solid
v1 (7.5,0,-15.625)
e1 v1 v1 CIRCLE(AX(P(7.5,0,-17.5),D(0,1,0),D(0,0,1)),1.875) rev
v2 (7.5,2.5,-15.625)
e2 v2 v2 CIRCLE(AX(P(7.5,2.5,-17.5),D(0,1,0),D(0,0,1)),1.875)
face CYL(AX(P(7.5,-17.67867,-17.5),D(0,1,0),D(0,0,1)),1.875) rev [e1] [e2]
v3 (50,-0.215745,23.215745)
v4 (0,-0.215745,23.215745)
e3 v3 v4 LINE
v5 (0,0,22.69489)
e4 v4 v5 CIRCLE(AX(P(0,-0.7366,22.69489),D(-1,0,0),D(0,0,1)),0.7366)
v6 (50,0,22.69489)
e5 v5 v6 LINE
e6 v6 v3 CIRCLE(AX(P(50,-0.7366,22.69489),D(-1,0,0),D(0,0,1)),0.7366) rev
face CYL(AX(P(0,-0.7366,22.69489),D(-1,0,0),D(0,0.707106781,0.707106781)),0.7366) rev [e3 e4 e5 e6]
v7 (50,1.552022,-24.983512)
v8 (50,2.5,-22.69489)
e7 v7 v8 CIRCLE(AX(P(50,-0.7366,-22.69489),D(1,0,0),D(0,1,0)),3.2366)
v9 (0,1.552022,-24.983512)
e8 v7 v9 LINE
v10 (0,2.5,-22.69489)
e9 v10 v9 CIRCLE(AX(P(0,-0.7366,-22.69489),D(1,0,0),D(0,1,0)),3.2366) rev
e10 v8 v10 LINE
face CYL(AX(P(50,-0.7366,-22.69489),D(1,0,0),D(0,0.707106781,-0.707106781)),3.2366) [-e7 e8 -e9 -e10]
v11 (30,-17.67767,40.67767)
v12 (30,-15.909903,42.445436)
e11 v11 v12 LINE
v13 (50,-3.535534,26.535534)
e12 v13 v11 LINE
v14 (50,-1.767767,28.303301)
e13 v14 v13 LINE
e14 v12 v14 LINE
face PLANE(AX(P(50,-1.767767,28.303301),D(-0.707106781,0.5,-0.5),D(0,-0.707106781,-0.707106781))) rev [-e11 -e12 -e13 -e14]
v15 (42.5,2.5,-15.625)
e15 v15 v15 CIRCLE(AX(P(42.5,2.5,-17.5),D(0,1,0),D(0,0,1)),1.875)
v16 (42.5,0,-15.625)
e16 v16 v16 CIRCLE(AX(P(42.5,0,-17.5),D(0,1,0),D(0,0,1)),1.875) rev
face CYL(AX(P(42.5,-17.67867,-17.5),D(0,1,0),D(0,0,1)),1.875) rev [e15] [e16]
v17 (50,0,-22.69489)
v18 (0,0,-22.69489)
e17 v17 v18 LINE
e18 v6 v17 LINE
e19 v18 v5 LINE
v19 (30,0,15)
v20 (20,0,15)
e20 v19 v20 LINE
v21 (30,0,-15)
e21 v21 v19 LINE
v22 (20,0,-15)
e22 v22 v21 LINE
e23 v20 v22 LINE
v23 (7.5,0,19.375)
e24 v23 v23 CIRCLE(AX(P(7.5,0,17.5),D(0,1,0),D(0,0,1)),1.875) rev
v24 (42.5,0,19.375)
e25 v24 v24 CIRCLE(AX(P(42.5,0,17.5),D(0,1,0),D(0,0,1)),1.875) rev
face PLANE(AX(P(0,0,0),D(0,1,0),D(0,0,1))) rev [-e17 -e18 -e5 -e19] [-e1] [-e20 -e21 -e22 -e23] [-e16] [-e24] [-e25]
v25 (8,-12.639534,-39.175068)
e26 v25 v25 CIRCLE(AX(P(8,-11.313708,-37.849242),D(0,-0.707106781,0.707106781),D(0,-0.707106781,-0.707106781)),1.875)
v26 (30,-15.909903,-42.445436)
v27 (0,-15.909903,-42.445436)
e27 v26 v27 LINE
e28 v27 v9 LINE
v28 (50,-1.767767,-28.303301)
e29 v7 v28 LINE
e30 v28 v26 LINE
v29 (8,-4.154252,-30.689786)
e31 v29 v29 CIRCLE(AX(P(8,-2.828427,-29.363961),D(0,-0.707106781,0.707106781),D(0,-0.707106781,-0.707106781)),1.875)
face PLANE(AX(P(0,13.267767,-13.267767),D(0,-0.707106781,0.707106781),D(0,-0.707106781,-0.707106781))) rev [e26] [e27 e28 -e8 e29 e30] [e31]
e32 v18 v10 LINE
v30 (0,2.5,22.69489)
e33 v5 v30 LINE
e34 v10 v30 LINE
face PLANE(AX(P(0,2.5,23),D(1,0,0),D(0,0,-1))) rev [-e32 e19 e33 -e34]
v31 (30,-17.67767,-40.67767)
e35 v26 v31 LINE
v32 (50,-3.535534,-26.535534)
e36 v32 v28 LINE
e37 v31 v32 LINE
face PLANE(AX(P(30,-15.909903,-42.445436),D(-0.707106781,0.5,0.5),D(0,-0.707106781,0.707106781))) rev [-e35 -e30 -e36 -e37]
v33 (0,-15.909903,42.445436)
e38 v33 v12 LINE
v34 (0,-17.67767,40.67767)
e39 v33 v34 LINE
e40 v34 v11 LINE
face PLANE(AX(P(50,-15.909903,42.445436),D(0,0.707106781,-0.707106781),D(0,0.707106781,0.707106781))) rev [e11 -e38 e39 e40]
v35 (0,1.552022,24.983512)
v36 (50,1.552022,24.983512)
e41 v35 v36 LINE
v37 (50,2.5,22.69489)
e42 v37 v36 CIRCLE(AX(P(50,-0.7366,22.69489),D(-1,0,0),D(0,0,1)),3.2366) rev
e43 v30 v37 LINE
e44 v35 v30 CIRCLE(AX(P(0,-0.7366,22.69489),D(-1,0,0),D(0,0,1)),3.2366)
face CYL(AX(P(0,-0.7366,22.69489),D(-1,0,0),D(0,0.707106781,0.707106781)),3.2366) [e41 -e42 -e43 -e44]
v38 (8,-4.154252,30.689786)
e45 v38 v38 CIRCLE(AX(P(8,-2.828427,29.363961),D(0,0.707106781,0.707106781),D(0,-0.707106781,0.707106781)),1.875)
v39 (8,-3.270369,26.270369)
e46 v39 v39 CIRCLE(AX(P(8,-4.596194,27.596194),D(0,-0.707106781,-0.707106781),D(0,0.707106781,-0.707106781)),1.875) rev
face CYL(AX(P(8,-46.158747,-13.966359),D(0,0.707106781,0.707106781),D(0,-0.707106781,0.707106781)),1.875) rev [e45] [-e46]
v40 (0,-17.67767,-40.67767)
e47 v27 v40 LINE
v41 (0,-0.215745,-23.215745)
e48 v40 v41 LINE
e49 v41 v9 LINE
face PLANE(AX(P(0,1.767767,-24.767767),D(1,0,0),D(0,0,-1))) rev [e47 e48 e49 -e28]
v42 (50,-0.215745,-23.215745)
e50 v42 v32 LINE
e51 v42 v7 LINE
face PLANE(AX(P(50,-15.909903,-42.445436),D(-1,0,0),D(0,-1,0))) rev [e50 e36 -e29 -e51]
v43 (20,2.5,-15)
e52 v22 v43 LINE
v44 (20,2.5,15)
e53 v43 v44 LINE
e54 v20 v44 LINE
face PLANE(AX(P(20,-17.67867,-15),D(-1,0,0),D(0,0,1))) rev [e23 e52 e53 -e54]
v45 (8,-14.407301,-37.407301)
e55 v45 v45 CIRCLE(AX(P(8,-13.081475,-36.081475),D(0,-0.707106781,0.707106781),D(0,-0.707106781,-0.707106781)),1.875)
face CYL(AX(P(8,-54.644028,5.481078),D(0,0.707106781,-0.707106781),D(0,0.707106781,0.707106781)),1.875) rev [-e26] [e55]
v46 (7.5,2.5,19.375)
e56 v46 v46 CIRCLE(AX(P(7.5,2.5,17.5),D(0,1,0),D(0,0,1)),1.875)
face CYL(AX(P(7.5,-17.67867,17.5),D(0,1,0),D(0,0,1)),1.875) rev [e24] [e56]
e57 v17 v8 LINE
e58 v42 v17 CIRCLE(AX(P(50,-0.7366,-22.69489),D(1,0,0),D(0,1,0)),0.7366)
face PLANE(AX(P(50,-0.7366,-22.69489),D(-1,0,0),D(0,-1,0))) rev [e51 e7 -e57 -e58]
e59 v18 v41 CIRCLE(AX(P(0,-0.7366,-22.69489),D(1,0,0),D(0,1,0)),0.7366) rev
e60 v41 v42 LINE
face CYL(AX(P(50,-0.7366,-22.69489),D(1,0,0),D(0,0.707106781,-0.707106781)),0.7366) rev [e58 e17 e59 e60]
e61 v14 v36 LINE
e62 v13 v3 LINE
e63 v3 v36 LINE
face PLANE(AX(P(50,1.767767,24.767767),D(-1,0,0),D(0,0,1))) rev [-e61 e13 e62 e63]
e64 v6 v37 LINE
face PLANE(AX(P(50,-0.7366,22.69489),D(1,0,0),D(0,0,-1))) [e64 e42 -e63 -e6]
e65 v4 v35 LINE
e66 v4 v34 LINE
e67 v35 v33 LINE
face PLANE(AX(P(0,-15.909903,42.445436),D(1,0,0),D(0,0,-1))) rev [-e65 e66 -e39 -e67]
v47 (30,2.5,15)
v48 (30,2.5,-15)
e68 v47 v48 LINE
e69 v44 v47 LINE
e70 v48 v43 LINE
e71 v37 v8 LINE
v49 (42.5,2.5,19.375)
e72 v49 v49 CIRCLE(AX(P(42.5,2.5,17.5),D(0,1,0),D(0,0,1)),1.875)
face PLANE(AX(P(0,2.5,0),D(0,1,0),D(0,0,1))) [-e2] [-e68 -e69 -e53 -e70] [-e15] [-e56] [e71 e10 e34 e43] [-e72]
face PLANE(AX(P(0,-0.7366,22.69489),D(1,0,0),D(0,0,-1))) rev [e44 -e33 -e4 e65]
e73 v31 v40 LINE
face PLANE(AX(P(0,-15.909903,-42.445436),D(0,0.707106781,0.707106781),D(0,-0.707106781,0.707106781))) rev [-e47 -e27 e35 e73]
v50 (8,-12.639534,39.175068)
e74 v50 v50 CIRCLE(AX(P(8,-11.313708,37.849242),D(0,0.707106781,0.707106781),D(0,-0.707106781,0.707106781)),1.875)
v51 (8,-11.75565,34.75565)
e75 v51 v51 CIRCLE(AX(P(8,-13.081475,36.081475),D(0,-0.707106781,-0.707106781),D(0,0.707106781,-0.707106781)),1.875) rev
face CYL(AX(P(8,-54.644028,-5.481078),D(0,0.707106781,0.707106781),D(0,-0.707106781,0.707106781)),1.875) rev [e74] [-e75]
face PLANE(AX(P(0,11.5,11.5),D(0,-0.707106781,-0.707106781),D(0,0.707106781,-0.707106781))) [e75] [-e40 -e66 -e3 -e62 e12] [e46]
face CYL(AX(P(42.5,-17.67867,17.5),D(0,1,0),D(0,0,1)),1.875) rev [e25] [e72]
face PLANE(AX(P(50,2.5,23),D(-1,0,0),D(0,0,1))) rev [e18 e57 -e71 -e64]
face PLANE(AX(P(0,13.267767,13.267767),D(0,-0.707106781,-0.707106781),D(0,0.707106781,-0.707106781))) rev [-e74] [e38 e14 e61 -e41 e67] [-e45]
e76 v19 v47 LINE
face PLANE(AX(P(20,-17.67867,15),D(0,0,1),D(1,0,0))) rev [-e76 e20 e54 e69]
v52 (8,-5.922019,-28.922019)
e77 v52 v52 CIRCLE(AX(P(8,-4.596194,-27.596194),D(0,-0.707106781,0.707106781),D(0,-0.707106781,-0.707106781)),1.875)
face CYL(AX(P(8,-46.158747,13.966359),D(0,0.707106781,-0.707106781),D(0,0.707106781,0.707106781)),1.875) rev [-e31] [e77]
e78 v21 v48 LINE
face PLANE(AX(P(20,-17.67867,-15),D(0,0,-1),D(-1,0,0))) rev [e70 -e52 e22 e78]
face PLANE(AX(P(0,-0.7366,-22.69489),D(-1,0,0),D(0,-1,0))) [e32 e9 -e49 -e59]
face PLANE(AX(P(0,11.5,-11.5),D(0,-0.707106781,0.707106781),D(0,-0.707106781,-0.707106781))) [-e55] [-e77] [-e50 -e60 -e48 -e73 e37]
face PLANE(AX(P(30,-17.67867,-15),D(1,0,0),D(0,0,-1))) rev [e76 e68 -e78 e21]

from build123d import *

# Parameters (mm, degrees)
SKETCH1_W                      = 50
SKETCH1_H                      = 46
BASE_FLANGE1_DEPTH             = 2.5
EDGE_FLANGE1_STRIP_CUT_DEPTH   = 50
EDGE_FLANGE1_STRIP_CUT_2_DEPTH = 50
EDGE_FLANGE1_DEPTH             = 50
EDGE_FLANGE1_BEND_DEPTH        = 50
CUT_EXTRUDE1_REACH             = 83.004
SKETCH13_R                     = 1.875
CUT_EXTRUDE2_REACH             = 70.62
SKETCH14_R                     = 1.875
CHAMFER1_SIZE                  = 20
CUT_EXTRUDE3_REACH             = 70.62
SKETCH15_W                     = 10
SKETCH15_H                     = 30


# Sheet-metal steps are written as plain solids
with BuildPart() as part:
    # Sketch1 → Base-Flange1 (new body)
    with BuildSketch(Plane(origin=(0, 0, 0), x_dir=(1, 0, 0), z_dir=(0, 1, 0))):
        with Locations((25, 0)):
            Rectangle(SKETCH1_W, SKETCH1_H)
    extrude(amount=BASE_FLANGE1_DEPTH)

    # Edge-Flange1 strip (across the edge) → Edge-Flange1 strip cut (cut)
    with BuildSketch(Plane(origin=(0, 0, -23), x_dir=(0, -0.7071067811865512, 0.7071067811865438), z_dir=(1, 0, 0))):
        Polygon((-9.66479933, 6.129265424), (-1.552021808, -1.983512098), (0.215745145, -0.215745145), (-7.897032377, 7.897032377), align=None)
    extrude(amount=EDGE_FLANGE1_STRIP_CUT_DEPTH, mode=Mode.SUBTRACT)

    # Edge-Flange1 strip 2 (across the edge) → Edge-Flange1 strip cut 2 (cut)
    with BuildSketch(Plane(origin=(50, 0, 23), x_dir=(0, -0.7071067811865512, -0.7071067811865438), z_dir=(-1, 0, 0))):
        Polygon((-9.66479933, 6.129265424), (-1.552021808, -1.983512098), (0.215745145, -0.215745145), (-7.897032377, 7.897032377), align=None)
    extrude(amount=EDGE_FLANGE1_STRIP_CUT_2_DEPTH, mode=Mode.SUBTRACT)

    # Edge-Flange1 section (across the edge) → Edge-Flange1 (add)
    with BuildSketch(Plane(origin=(0, 0, -23), x_dir=(0, -0.7071067811865512, 0.7071067811865438), z_dir=(1, 0, 0))):
        with BuildLine():
            Line((-2.5, 0.30510971), (-2.5, 25))
            Line((-2.5, 25), (0, 25))
            Line((0, 25), (0, 0.30510971))
            ThreePointArc((0, 0.30510971), (0.056070336, 0.023225094), (0.215745145, -0.215745145))
            Line((0.215745145, -0.215745145), (-1.552021808, -1.983512098))
            ThreePointArc((-1.552021808, -1.983512098), (-2.253628495, -0.933483487), (-2.5, 0.30510971))
        make_face()
    extrude(amount=EDGE_FLANGE1_DEPTH)

    # Edge-Flange1 section 2 (across the edge) → Edge-Flange1 bend (add)
    with BuildSketch(Plane(origin=(50, 0, 23), x_dir=(0, -0.7071067811865512, -0.7071067811865438), z_dir=(-1, 0, 0))):
        with BuildLine():
            Line((-2.5, 0.30510971), (-2.5, 25))
            Line((-2.5, 25), (0, 25))
            Line((0, 25), (0, 0.30510971))
            ThreePointArc((0, 0.30510971), (0.056070336, 0.023225094), (0.215745145, -0.215745145))
            Line((0.215745145, -0.215745145), (-1.552021808, -1.983512098))
            ThreePointArc((-1.552021808, -1.983512098), (-2.253628495, -0.933483487), (-2.5, 0.30510971))
        make_face()
    extrude(amount=EDGE_FLANGE1_BEND_DEPTH)

    # Sketch13 → Cut-Extrude1 (cut, up to next)
    with BuildSketch(Plane(origin=(0, 13.267766953, 13.267766953), x_dir=(1, 0, 0), z_dir=(0, 0.7071067811865513, 0.7071067811865438)), mode=Mode.PRIVATE) as cut_extrude1_sk1:
        with Locations(Location((8, -22.763455967, 0), (0, 0, 270))):
            Circle(SKETCH13_R)
    cut_extrude1_tool1 = extrude(cut_extrude1_sk1.sketch, amount=-CUT_EXTRUDE1_REACH, mode=Mode.PRIVATE) & part.part
    # Sketch13 → Cut-Extrude1 (cut, up to next)
    with BuildSketch(Plane(origin=(0, 13.267766953, 13.267766953), x_dir=(1, 0, 0), z_dir=(0, 0.7071067811865513, 0.7071067811865438)), mode=Mode.PRIVATE) as cut_extrude1_sk2:
        with Locations(Location((8, -34.763455967, 0), (0, 0, 270))):
            Circle(SKETCH13_R)
    cut_extrude1_tool2 = extrude(cut_extrude1_sk2.sketch, amount=-CUT_EXTRUDE1_REACH, mode=Mode.PRIVATE) & part.part
    cut_extrude1_1 = cut_extrude1_tool1.solids().sort_by_distance((8, -2.828427, 29.363961))[0]
    add(cut_extrude1_1, mode=Mode.SUBTRACT)
    cut_extrude1_2 = cut_extrude1_tool2.solids().sort_by_distance((8, -11.313708, 37.849242))[0]
    add(cut_extrude1_2, mode=Mode.SUBTRACT)
    cut_extrude1 = cut_extrude1_1 + cut_extrude1_2  # Cut-Extrude1 as one shape, for the pattern or mirror that repeats it

    # Mirror1: Cut-Extrude1 across plane
    add(cut_extrude1.mirror(Plane.XY), mode=Mode.SUBTRACT)

    # Sketch14 → Cut-Extrude2 (cut, up to next)
    with BuildSketch(Plane(origin=(0, 2.5, 0), x_dir=(1, 0, 0), z_dir=(0, 1, 0)), mode=Mode.PRIVATE) as cut_extrude2_sk1:
        with Locations(Location((7.5, 17.5, 0), (0, 0, 270))):
            Circle(SKETCH14_R)
    cut_extrude2_tool1 = extrude(cut_extrude2_sk1.sketch, amount=-CUT_EXTRUDE2_REACH, mode=Mode.PRIVATE) & part.part
    # Sketch14 → Cut-Extrude2 (cut, up to next)
    with BuildSketch(Plane(origin=(0, 2.5, 0), x_dir=(1, 0, 0), z_dir=(0, 1, 0)), mode=Mode.PRIVATE) as cut_extrude2_sk2:
        with Locations(Location((42.5, 17.5, 0), (0, 0, 270))):
            Circle(SKETCH14_R)
    cut_extrude2_tool2 = extrude(cut_extrude2_sk2.sketch, amount=-CUT_EXTRUDE2_REACH, mode=Mode.PRIVATE) & part.part
    # Sketch14 → Cut-Extrude2 (cut, up to next)
    with BuildSketch(Plane(origin=(0, 2.5, 0), x_dir=(1, 0, 0), z_dir=(0, 1, 0)), mode=Mode.PRIVATE) as cut_extrude2_sk3:
        with Locations(Location((7.5, -17.5, 0), (0, 0, 270))):
            Circle(SKETCH14_R)
    cut_extrude2_tool3 = extrude(cut_extrude2_sk3.sketch, amount=-CUT_EXTRUDE2_REACH, mode=Mode.PRIVATE) & part.part
    # Sketch14 → Cut-Extrude2 (cut, up to next)
    with BuildSketch(Plane(origin=(0, 2.5, 0), x_dir=(1, 0, 0), z_dir=(0, 1, 0)), mode=Mode.PRIVATE) as cut_extrude2_sk4:
        with Locations(Location((42.5, -17.5, 0), (0, 0, 270))):
            Circle(SKETCH14_R)
    cut_extrude2_tool4 = extrude(cut_extrude2_sk4.sketch, amount=-CUT_EXTRUDE2_REACH, mode=Mode.PRIVATE) & part.part
    add(cut_extrude2_tool1.solids().sort_by_distance((7.5, 2.5, -17.5))[0], mode=Mode.SUBTRACT)
    add(cut_extrude2_tool2.solids().sort_by_distance((42.5, 2.5, -17.5))[0], mode=Mode.SUBTRACT)
    add(cut_extrude2_tool3.solids().sort_by_distance((7.5, 2.5, 17.5))[0], mode=Mode.SUBTRACT)
    add(cut_extrude2_tool4.solids().sort_by_distance((42.5, 2.5, 17.5))[0], mode=Mode.SUBTRACT)

    # Chamfer1
    chamfer1_edges = [part.edges().sort_by_distance(p)[0] for p in [
        (50, -16.793786053, -41.561553006),
        (50, -16.793786053, 41.561553006),
    ]]
    chamfer(chamfer1_edges, length=CHAMFER1_SIZE)

    # Sketch15 → Cut-Extrude3 (cut, up to next)
    with BuildSketch(Plane(origin=(0, 2.5, 0), x_dir=(1, 0, 0), z_dir=(0, 1, 0)), mode=Mode.PRIVATE) as cut_extrude3_sk1:
        with Locations((25, 0)):
            Rectangle(SKETCH15_W, SKETCH15_H)
    cut_extrude3_tool1 = extrude(cut_extrude3_sk1.sketch, amount=-CUT_EXTRUDE3_REACH, mode=Mode.PRIVATE) & part.part
    add(cut_extrude3_tool1.solids().sort_by_distance((25, 2.5, 0))[0], mode=Mode.SUBTRACT)


solid = part.part
